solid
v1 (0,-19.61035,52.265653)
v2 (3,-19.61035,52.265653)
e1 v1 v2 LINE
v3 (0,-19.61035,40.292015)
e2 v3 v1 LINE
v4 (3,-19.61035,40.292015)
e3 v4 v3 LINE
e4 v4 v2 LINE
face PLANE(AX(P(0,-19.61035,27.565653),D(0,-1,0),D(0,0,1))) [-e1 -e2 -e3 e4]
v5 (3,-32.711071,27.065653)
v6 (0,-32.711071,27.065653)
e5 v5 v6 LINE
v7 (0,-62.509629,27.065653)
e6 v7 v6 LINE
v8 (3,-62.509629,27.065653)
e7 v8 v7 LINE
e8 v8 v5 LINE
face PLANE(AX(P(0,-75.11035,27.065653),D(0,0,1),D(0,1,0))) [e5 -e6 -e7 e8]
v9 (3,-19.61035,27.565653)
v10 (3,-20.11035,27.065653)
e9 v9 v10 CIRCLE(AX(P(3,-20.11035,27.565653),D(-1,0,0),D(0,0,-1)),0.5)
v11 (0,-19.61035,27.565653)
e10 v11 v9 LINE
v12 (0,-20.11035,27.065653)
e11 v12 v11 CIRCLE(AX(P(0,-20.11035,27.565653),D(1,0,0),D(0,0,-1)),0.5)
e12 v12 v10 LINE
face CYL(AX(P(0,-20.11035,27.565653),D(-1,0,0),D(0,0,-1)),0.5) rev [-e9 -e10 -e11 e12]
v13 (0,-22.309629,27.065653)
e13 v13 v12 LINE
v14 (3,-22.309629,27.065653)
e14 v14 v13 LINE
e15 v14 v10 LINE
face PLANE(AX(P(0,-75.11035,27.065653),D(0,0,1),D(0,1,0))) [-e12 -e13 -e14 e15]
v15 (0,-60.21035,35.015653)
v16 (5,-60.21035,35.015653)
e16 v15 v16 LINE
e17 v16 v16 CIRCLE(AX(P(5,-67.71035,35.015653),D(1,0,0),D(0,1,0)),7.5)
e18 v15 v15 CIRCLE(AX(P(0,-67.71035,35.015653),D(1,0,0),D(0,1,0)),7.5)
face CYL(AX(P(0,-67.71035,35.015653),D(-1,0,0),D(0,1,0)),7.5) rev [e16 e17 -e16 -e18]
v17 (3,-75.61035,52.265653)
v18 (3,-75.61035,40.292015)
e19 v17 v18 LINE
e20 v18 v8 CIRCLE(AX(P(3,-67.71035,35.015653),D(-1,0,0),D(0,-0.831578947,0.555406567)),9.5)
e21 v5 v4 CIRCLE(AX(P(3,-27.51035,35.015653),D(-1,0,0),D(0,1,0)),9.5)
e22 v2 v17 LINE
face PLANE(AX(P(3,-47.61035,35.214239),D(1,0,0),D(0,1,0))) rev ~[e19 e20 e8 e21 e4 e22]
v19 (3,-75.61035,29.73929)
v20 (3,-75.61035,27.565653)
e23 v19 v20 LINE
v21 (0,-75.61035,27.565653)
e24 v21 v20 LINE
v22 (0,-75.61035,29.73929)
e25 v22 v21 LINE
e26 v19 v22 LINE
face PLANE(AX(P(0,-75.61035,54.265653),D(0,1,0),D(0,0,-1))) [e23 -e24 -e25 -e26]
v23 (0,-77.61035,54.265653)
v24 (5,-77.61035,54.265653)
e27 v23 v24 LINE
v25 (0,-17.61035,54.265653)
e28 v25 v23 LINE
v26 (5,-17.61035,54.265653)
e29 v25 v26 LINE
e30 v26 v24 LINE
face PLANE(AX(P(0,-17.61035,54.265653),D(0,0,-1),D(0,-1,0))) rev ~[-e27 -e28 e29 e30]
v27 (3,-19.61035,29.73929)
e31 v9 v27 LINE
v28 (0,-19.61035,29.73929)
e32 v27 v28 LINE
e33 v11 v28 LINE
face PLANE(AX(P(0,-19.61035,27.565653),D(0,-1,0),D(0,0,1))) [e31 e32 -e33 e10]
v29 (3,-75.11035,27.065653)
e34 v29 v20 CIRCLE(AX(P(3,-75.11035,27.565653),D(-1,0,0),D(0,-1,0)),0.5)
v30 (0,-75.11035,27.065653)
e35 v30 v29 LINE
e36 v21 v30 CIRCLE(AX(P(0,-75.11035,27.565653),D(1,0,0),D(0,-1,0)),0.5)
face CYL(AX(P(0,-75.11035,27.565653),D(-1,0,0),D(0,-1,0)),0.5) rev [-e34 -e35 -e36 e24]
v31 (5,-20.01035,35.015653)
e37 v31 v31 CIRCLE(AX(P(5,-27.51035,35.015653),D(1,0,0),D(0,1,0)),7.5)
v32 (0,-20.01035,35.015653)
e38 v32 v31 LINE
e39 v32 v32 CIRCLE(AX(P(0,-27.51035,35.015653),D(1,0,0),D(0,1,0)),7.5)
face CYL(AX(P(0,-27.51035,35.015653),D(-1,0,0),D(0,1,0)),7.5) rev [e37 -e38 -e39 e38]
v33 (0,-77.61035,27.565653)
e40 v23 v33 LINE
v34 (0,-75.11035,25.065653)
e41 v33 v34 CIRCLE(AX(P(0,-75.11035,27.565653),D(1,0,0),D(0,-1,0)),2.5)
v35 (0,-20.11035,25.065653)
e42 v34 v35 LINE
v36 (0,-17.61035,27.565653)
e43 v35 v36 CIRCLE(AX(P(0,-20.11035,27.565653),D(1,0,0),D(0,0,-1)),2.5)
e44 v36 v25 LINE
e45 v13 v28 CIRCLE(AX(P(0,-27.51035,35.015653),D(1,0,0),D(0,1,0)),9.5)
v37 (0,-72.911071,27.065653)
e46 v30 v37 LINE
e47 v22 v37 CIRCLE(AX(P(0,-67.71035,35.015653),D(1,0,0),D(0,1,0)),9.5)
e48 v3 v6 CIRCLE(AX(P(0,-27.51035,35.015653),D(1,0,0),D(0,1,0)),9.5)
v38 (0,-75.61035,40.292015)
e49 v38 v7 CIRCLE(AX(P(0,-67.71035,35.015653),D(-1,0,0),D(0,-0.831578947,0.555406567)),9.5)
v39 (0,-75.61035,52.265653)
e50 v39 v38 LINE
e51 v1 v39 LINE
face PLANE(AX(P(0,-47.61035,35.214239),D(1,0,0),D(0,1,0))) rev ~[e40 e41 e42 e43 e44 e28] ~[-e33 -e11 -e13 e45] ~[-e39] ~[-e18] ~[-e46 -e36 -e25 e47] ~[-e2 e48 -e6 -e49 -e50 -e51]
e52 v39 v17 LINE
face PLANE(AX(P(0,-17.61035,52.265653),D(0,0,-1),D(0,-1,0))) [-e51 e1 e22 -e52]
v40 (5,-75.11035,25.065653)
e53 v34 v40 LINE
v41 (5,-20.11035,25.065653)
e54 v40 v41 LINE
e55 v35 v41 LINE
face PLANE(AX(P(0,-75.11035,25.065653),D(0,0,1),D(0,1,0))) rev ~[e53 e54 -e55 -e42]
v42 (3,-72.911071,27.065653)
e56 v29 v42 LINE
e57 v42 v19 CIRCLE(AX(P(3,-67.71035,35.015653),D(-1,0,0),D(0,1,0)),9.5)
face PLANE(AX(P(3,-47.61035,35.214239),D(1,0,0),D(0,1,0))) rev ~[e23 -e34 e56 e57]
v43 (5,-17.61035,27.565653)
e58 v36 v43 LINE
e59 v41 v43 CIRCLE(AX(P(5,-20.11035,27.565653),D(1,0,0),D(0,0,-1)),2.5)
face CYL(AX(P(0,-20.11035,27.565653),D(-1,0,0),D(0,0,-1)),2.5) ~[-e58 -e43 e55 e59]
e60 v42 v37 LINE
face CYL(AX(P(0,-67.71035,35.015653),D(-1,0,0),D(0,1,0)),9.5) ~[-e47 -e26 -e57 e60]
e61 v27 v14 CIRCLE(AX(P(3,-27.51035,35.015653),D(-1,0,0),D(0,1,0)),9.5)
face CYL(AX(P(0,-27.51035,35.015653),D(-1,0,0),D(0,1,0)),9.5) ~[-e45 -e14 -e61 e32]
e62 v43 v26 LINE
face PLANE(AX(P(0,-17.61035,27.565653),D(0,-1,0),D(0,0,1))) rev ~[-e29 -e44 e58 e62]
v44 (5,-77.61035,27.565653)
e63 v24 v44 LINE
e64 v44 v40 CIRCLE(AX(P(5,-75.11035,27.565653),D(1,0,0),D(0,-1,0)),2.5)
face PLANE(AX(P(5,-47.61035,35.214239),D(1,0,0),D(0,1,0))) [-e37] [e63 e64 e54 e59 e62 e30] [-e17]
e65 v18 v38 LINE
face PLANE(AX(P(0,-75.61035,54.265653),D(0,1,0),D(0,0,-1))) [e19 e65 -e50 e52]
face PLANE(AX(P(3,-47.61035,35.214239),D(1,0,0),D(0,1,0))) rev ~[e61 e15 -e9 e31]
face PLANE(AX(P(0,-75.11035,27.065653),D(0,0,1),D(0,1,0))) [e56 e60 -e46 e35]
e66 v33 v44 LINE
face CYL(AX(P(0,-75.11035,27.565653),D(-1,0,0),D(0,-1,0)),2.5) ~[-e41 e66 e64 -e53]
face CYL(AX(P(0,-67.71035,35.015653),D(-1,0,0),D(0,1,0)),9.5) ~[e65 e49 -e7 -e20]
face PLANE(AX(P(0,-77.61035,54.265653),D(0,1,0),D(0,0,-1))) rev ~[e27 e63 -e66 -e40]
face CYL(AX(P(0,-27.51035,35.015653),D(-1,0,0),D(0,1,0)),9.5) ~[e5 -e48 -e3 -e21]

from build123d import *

# Parameters (mm, degrees)
F0_W     = 13.5
F0_H     = 6.75
F1_DEPTH = 20
F2_W     = 8
F2_H     = 26.4694701647
F3_DEPTH = 12
F4_R     = 0.49999
F7_R     = 7.5
F8_DEPTH = 5
F9_T     = -2


# Not quite as in the source:
# - a fillet or chamfer is up to 0.001 mm smaller than in the source, because OpenCascade refuses the exact size
# - a feature of the source that left no trace in its solid (it failed there, or was rolled back) is left out


with BuildPart() as f1:
    # F0 (on Right) → F1 (new body)
    with BuildSketch(Plane.YZ):
        with BuildLine():
            Line((21.2005410668, -21.2570374378), (21.2005410668, 3.4429625622))
            Line((21.2005410668, 3.4429625622), (24.7505410668, 3.4429625622))
            Line((24.7505410668, 3.4429625622), (24.7505410668, -5.3425713437))
            Line((24.7505410668, -5.3425713437), (24.7505410668, -14.0570374378))
            ThreePointArc((24.7505410668, -14.0570374378), (25.4827741138, -15.8248043907), (27.2505410668, -16.5570374378))
            Line((27.2505410668, -16.5570374378), (31.4505410668, -16.5570374378))
            ThreePointArc((31.4505410668, -16.5570374378), (33.2183080197, -15.8248043907), (33.9505410668, -14.0570374378))
            Line((33.9505410668, -14.0570374378), (33.9505410668, -5.3425713437))
            Line((33.9505410668, -5.3425713437), (33.9505410668, 6.3718947504))
            ThreePointArc((33.9505410668, 6.3718947504), (34.4092996144, 7.8152704233), (35.6172077334, 8.7289173543))
            ThreePointArc((35.6172077334, 8.7289173543), (37.4860749727, 16.9784964681), (29.2364958588, 15.1096292289))
            ThreePointArc((29.2364958588, 15.1096292289), (28.3228489279, 13.9017211099), (26.8794732549, 13.4429625622))
            Line((26.8794732549, 13.4429625622), (15.2005410668, 13.4429625622))
            Line((15.2005410668, 13.4429625622), (-1.2994589332, 13.4429625622))
            ThreePointArc((-1.2994589332, 13.4429625622), (-3.0672258862, 12.7107295152), (-3.7994589332, 10.9429625622))
            Line((-3.7994589332, 10.9429625622), (-3.7994589332, 5.9429625622))
            ThreePointArc((-3.7994589332, 5.9429625622), (-3.0672258862, 4.1751956093), (-1.2994589332, 3.4429625622))
            Line((-1.2994589332, 3.4429625622), (5.1650071608, 3.4429625622))
            ThreePointArc((5.1650071608, 3.4429625622), (6.1217157417, 3.2526613935), (6.9327741138, 2.7107295152))
            Line((6.9327741138, 2.7107295152), (14.4934342856, -4.8499306566))
            Line((14.4934342856, -4.8499306566), (15.4683080197, -5.8248043907))
            ThreePointArc((15.4683080197, -5.8248043907), (16.010239898, -6.6358627628), (16.2005410668, -7.5925713437))
            Line((16.2005410668, -7.5925713437), (16.2005410668, -21.2570374378))
            ThreePointArc((16.2005410668, -21.2570374378), (16.4934342856, -21.964144219), (17.2005410668, -22.2570374378))
            Line((17.2005410668, -22.2570374378), (20.2005410668, -22.2570374378))
            ThreePointArc((20.2005410668, -22.2570374378), (20.9076478479, -21.964144219), (21.2005410668, -21.2570374378))
        make_face()
        with Locations((5.7005410668, 7.8179625622)):
            Rectangle(F0_W, F0_H, mode=Mode.SUBTRACT)
    extrude(amount=F1_DEPTH)

    # F2 (on face) → F3 (cut)
    with BuildSketch(Plane.YZ.offset(20)):
        with Locations((5.7005410668, 11.1929625622)):
            Rectangle(F2_W, F2_H)
    extrude(amount=-F3_DEPTH, mode=Mode.SUBTRACT)

    # F4 (radius 0.5 in the source; OpenCascade refuses exactly that, so slightly less here)
    f4_edges = [f1.edges().sort_by_distance(p)[0] for p in [
        (14, 1.700541, 11.192963),
        (14, 1.700541, 13.442963),
        (14, 1.700541, 4.442963),
        (14, 1.700541, 3.442963),
        (10, -1.049459, 4.442963),
        (10, -1.049459, 11.192963),
        (10, 12.450541, 11.192963),
        (10, 12.450541, 4.442963),
        (14, 9.700541, 11.192963),
        (14, 9.700541, 13.442963),
        (14, 9.700541, 4.442963),
    ]]
    fillet(f4_edges, radius=F4_R)


with BuildPart() as f8:
    # F7 (on Right) → F8 (new body)
    with BuildSketch(Plane.YZ):
        with BuildLine():
            Line((-17.6103499532, 45.065652512), (-22.6103499532, 45.065652512))
            Line((-22.6103499532, 45.065652512), (-72.6103499532, 45.065652512))
            Line((-72.6103499532, 45.065652512), (-77.6103499532, 45.065652512))
            Line((-77.6103499532, 45.065652512), (-77.6103499532, 27.565652512))
            ThreePointArc((-77.6103499532, 27.565652512), (-76.8781169061, 25.7978855591), (-75.1103499532, 25.065652512))
            Line((-75.1103499532, 25.065652512), (-20.1103499532, 25.065652512))
            ThreePointArc((-20.1103499532, 25.065652512), (-18.3425830002, 25.7978855591), (-17.6103499532, 27.565652512))
            Line((-17.6103499532, 27.565652512), (-17.6103499532, 45.065652512))
        make_face()
        with Locations((-67.7103499532, 35.015652512)):
            Circle(F7_R, mode=Mode.SUBTRACT)
        with Locations((-27.5103499532, 35.015652512)):
            Circle(F7_R, mode=Mode.SUBTRACT)
        Polygon((-72.6103499532, 45.065652512), (-22.6103499532, 45.065652512), (-17.6103499532, 45.065652512), (-17.6103499532, 54.265652512), (-77.6103499532, 54.265652512), (-77.6103499532, 45.065652512), align=None)
    extrude(amount=F8_DEPTH)

    # F9
    f9_openings = [f8.faces().sort_by_distance(p)[0] for p in [
        (0, -47.61035, 40.869984),
    ]]
    offset(amount=F9_T, openings=f9_openings)


solid = f8.part
